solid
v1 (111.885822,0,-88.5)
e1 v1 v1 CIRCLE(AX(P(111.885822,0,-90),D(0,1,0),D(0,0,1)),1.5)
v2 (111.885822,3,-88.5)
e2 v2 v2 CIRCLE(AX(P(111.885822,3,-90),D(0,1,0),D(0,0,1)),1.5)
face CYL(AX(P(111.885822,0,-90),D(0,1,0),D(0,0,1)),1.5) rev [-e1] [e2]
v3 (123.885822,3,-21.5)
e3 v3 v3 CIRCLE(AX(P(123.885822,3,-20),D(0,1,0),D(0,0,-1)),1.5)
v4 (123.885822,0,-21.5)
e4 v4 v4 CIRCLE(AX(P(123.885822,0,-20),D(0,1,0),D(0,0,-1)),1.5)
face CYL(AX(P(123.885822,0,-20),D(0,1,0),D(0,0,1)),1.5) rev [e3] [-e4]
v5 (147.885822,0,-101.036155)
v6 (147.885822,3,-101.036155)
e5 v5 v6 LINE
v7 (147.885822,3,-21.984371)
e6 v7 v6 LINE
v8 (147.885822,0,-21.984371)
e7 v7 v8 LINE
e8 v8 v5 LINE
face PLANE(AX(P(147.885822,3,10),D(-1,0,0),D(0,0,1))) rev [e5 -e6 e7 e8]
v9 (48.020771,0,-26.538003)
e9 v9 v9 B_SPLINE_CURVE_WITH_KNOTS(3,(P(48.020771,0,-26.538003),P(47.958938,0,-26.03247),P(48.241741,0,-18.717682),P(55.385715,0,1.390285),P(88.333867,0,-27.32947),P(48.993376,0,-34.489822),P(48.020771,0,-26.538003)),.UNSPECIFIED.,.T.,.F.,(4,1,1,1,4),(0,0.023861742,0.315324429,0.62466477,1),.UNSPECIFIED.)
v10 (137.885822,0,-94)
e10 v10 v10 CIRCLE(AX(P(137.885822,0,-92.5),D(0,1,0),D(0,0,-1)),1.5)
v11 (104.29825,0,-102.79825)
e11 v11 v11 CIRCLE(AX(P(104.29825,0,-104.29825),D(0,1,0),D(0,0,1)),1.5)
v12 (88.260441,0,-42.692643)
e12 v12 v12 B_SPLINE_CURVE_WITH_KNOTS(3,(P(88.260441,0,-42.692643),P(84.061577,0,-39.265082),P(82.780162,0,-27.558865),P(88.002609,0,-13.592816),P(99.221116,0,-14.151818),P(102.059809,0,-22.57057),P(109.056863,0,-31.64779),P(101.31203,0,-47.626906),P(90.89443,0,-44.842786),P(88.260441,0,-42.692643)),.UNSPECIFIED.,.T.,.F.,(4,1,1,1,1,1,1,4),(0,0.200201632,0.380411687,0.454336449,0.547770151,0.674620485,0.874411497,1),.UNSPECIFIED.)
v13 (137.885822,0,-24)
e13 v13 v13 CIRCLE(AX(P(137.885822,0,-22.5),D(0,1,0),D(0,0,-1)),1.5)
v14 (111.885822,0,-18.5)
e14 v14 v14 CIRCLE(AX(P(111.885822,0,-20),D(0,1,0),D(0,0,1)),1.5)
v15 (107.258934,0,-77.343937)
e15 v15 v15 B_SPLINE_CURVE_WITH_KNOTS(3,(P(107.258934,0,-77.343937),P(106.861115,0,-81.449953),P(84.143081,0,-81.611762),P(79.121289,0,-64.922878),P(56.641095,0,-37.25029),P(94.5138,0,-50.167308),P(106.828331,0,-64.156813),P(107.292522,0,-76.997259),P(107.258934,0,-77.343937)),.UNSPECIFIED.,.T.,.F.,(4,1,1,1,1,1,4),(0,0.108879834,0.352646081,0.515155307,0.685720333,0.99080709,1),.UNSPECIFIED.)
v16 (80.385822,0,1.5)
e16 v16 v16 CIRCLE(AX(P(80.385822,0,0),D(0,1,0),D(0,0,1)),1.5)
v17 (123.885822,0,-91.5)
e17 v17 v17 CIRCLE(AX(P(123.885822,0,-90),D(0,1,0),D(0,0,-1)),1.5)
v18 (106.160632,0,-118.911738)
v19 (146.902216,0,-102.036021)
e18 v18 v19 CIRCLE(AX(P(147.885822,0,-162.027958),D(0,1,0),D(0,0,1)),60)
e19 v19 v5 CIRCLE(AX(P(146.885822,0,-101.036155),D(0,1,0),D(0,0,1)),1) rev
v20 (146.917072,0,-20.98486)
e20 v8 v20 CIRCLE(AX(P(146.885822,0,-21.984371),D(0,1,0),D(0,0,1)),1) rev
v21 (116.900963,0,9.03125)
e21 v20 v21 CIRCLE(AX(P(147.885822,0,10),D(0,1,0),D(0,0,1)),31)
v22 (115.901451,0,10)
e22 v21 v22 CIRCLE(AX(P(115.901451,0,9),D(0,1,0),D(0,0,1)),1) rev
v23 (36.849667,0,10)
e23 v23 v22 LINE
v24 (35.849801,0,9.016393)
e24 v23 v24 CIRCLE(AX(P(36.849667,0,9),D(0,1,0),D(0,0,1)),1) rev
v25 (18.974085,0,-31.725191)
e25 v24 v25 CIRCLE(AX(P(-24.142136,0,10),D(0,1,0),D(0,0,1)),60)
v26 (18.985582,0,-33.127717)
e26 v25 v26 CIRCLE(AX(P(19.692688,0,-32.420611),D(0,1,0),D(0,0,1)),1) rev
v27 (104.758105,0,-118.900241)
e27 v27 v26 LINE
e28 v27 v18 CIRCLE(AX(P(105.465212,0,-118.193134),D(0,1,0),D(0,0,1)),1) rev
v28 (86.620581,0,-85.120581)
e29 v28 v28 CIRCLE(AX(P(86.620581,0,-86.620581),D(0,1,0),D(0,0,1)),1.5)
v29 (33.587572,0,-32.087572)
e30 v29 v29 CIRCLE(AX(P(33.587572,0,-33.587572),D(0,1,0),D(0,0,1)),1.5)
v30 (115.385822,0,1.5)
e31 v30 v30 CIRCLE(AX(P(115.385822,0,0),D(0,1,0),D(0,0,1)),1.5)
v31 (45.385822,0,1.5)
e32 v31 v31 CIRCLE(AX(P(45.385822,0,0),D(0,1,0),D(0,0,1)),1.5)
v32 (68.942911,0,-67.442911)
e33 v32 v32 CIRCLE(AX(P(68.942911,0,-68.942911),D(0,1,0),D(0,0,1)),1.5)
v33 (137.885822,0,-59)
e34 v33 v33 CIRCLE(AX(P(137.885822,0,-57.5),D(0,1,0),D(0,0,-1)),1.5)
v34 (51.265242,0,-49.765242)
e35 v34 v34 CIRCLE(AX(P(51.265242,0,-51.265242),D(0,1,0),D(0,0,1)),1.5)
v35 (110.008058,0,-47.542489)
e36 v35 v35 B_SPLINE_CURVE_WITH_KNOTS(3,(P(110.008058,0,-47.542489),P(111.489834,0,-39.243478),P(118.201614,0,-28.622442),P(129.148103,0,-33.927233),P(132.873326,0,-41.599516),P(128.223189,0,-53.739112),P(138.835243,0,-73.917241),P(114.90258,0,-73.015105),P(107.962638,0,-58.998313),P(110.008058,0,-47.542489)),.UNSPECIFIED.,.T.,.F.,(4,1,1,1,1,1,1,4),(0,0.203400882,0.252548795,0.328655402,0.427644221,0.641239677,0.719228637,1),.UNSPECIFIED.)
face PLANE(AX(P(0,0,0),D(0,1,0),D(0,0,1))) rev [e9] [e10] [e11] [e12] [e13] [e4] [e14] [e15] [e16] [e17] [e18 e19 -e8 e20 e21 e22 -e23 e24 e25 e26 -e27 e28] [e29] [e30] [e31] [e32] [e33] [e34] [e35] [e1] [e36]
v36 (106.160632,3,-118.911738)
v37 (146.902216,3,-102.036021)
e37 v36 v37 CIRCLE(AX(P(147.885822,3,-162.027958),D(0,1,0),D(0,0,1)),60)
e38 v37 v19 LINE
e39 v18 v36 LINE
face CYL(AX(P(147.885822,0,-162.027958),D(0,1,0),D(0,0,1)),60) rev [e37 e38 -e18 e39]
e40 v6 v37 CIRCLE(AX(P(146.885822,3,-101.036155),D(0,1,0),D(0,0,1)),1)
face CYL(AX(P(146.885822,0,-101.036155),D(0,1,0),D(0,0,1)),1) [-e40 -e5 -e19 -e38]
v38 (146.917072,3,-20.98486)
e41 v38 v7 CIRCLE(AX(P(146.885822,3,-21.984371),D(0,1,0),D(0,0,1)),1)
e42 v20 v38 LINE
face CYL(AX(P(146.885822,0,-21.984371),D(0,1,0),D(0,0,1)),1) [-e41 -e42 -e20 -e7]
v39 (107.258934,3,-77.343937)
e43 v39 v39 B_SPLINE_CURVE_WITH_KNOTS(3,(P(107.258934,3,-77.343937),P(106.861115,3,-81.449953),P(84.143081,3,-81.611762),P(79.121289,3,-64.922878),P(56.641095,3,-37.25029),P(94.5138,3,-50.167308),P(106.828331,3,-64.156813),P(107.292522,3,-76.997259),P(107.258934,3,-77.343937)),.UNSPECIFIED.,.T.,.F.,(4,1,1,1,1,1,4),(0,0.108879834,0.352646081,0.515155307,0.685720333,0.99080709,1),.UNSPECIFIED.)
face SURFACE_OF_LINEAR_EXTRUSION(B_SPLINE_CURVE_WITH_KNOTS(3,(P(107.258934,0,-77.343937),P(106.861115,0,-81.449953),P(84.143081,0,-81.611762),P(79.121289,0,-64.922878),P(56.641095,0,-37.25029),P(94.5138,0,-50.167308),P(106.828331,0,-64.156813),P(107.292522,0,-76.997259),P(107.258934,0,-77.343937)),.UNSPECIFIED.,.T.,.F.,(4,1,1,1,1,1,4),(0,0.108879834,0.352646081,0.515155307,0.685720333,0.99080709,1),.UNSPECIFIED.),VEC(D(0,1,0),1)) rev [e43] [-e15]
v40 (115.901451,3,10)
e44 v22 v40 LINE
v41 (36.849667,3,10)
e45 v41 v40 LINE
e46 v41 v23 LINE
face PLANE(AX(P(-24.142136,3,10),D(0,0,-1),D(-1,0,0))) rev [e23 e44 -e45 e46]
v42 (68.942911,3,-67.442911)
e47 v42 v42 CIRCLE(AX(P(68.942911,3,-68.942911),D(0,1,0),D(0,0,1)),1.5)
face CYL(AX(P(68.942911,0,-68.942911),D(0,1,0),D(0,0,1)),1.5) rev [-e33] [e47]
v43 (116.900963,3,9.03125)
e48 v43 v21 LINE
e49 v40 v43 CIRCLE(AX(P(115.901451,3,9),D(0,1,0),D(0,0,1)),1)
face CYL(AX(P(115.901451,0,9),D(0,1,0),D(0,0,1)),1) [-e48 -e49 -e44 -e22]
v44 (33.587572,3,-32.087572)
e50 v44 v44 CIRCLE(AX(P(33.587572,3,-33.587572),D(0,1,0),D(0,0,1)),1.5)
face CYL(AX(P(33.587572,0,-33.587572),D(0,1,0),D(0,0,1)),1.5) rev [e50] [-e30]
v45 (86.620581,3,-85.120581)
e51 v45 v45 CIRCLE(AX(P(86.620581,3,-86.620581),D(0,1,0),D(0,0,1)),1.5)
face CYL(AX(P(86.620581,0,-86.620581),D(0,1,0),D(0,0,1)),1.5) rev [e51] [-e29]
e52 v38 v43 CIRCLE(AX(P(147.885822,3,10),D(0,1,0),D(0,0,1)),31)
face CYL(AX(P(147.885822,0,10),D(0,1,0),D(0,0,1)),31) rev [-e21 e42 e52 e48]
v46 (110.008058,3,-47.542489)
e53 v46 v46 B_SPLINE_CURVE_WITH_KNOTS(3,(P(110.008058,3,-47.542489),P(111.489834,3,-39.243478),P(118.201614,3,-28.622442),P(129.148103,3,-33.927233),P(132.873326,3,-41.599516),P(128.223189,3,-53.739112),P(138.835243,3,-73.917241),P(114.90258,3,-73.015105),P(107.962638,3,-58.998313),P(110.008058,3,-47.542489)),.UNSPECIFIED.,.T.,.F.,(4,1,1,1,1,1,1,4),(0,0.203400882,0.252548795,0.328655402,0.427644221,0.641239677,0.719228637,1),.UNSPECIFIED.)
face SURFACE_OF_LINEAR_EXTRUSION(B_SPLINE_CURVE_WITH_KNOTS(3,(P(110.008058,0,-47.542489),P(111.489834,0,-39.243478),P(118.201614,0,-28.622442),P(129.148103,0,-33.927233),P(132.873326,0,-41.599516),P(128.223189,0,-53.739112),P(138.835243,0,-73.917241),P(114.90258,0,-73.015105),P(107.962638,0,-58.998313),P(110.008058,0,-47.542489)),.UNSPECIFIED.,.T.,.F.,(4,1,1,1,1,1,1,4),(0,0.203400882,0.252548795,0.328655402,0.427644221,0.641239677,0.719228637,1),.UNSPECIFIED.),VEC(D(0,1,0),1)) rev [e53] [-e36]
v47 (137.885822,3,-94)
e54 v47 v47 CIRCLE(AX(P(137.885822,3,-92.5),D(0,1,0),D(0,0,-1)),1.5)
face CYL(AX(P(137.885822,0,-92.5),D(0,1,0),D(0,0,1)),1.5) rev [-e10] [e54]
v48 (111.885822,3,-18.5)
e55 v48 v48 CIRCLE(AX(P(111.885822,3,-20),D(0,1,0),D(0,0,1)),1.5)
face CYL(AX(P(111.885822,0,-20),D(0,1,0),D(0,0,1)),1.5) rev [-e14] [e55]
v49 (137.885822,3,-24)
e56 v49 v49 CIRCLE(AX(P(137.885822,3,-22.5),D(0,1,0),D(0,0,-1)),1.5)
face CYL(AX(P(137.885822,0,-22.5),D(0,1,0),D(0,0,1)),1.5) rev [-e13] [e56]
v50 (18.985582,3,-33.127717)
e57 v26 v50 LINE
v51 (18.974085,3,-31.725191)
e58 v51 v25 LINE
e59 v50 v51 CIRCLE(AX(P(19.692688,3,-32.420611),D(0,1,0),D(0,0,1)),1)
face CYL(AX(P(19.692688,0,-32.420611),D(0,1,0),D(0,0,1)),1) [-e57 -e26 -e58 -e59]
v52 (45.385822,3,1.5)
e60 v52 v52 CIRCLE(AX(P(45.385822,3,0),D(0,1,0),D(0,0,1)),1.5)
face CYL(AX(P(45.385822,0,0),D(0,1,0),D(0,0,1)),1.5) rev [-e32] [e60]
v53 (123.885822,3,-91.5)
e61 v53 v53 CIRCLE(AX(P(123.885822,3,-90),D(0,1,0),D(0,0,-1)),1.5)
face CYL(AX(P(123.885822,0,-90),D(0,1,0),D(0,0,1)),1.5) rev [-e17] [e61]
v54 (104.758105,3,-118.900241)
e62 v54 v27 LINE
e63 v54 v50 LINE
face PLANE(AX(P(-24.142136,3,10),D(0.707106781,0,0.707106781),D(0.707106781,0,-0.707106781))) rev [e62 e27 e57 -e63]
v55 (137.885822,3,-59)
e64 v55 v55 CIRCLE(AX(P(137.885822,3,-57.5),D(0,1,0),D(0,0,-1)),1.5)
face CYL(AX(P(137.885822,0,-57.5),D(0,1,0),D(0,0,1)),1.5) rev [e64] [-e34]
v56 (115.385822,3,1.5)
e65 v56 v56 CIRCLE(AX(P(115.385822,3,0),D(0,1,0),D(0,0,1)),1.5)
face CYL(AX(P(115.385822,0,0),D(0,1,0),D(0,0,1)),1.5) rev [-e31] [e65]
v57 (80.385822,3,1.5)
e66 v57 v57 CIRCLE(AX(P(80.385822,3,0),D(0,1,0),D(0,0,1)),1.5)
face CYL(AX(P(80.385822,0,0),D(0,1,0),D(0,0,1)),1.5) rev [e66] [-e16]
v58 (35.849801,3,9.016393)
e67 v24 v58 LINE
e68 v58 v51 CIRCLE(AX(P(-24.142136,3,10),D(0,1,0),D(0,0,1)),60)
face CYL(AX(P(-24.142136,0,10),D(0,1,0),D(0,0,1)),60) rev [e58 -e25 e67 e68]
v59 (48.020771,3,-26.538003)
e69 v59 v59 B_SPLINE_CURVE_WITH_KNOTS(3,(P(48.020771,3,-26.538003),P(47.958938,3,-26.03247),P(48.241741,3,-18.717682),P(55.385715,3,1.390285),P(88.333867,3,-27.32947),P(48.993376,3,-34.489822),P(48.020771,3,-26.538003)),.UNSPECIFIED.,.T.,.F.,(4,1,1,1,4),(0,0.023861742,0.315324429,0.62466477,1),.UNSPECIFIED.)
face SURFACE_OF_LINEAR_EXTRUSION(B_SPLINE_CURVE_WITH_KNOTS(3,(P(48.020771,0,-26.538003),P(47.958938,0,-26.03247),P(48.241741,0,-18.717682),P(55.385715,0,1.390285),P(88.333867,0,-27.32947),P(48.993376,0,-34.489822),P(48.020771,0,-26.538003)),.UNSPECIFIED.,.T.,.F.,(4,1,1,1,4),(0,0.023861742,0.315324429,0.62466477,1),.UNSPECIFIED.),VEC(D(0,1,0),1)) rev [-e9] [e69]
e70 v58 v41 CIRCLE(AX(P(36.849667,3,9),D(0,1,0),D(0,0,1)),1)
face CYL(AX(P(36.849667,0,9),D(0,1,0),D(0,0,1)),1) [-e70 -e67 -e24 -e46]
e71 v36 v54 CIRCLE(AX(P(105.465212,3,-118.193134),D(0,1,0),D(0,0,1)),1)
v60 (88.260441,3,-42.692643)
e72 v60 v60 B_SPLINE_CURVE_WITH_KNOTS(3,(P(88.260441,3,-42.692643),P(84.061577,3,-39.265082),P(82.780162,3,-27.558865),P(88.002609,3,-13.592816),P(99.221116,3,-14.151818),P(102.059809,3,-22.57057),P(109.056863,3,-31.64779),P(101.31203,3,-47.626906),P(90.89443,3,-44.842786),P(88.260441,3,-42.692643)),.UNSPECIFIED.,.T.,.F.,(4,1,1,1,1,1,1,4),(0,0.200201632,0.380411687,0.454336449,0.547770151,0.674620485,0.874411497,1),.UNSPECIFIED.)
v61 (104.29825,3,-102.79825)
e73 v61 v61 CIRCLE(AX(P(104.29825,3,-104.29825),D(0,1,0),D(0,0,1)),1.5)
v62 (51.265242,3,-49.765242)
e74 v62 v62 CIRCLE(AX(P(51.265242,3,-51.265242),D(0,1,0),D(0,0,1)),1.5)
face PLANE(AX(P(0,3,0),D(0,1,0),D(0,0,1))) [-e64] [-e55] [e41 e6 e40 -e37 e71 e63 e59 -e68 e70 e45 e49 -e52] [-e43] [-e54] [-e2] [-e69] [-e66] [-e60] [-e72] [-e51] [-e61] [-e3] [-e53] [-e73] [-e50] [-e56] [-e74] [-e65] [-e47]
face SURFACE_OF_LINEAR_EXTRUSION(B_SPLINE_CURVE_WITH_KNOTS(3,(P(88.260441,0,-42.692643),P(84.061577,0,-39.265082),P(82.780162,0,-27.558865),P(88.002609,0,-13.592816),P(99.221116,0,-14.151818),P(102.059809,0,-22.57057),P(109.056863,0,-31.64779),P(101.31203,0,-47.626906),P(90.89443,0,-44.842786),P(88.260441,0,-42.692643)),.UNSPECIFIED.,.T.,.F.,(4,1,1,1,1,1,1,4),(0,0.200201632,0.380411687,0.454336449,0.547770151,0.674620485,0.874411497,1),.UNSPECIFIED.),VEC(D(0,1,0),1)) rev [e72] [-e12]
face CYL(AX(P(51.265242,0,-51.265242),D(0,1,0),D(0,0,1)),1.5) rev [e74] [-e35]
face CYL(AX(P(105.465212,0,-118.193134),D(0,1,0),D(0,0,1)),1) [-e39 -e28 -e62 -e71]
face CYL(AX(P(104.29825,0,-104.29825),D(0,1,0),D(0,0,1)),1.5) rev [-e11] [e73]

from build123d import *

# Parameters (mm, degrees)
EXTRUDE_1_DEPTH     = 3
SKETCH_2_R          = 60
SKETCH_2_R_2        = 31
CUT_EXTRUDE_1_DEPTH = 220.390691703
SKETCH_3_R          = 1.5
CUT_EXTRUDE_2_DEPTH = 191.220260404
CUT_EXTRUDE_START   = -3
CUT_EXTRUDE_3_DEPTH = 3
FILLET_1_R          = 1


# Read off the part's stored shape, not the designer's step: 切除-拉伸3
with BuildPart() as part:
    # 草图1 → 凸台-拉伸1 (new body)
    with BuildSketch(Plane(origin=(0, 0, 0), x_dir=(1, 0, 0), z_dir=(0, 1, 0))):
        Polygon((147.885822331, -10), (147.885822331, 162.027957955), (-24.142135624, -10), align=None)
    extrude(amount=EXTRUDE_1_DEPTH)

    # 草图2 → 切除-拉伸1 (cut, through all)
    with BuildSketch(Plane(origin=(0, 3, 0), x_dir=(1, 0, 0), z_dir=(0, 1, 0))):
        with Locations((147.885822331, 162.027957955)):
            Circle(SKETCH_2_R)
        with Locations((-24.142135624, -10)):
            Circle(SKETCH_2_R)
        with Locations((147.885822331, -10)):
            Circle(SKETCH_2_R_2)
    extrude(amount=-CUT_EXTRUDE_1_DEPTH, mode=Mode.SUBTRACT)

    # 草图3 → 切除-拉伸2 (cut, through all)
    with BuildSketch(Plane(origin=(0, 3, 0), x_dir=(1, 0, 0), z_dir=(0, 1, 0))):
        with Locations(Location((115.385822331, 0, 0), (0, 0, 270))):
            Circle(SKETCH_3_R)
        with Locations(Location((80.385822331, 0, 0), (0, 0, 270))):
            Circle(SKETCH_3_R)
        with Locations(Location((45.385822331, 0, 0), (0, 0, 270))):
            Circle(SKETCH_3_R)
        with Locations(Location((33.587572106, 33.587572106, 0), (0, 0, 270))):
            Circle(SKETCH_3_R)
        with Locations(Location((51.265241636, 51.265241636, 0), (0, 0, 270))):
            Circle(SKETCH_3_R)
        with Locations(Location((68.942911166, 68.942911166, 0), (0, 0, 270))):
            Circle(SKETCH_3_R)
        with Locations(Location((86.620580695, 86.620580695, 0), (0, 0, 270))):
            Circle(SKETCH_3_R)
        with Locations(Location((104.298250225, 104.298250225, 0), (0, 0, 270))):
            Circle(SKETCH_3_R)
        with Locations(Location((137.885822331, 22.5, 0), (0, 0, 90))):
            Circle(SKETCH_3_R)
        with Locations(Location((137.885822331, 57.5, 0), (0, 0, 90))):
            Circle(SKETCH_3_R)
        with Locations(Location((137.885822331, 92.5, 0), (0, 0, 90))):
            Circle(SKETCH_3_R)
        with Locations(Location((111.885822331, 90, 0), (0, 0, 270))):
            Circle(SKETCH_3_R)
        with Locations(Location((111.885822331, 20, 0), (0, 0, 270))):
            Circle(SKETCH_3_R)
        with Locations(Location((123.885822331, 90, 0), (0, 0, 90))):
            Circle(SKETCH_3_R)
        with Locations(Location((123.885822331, 20, 0), (0, 0, 90))):
            Circle(SKETCH_3_R)
    extrude(amount=-CUT_EXTRUDE_2_DEPTH, mode=Mode.SUBTRACT)

    # 切除-拉伸3 outline → 切除-拉伸3 (cut)
    with BuildSketch(Plane(origin=(0, 3, 0), x_dir=(1, 0, 0), z_dir=(0, 1, 0)).offset(CUT_EXTRUDE_START)):
        with BuildLine():
            add(Edge.make_bspline(
                [(107.258933635, 77.343936504), (106.861115496, 81.449952702), (84.143080775, 81.611762246), (79.12128884, 64.922878035), (56.641094904, 37.250289862), (94.51379987, 50.167307725), (106.828330693, 64.156813109), (107.292522099, 76.997258554), (107.258933635, 77.343936504)],
                knots=[0, 0, 0, 0, 0.108879834, 0.352646081, 0.515155307, 0.685720333, 0.99080709, 1, 1, 1, 1], degree=3))
        make_face()
        with BuildLine():
            add(Edge.make_bspline(
                [(88.260440691, 42.692642695), (84.061577104, 39.265082408), (82.780161964, 27.558864749), (88.002608571, 13.59281611), (99.221115721, 14.151818352), (102.059809279, 22.570570112), (109.056863232, 31.647789519), (101.312029857, 47.626905876), (90.894430167, 44.842785832), (88.260440691, 42.692642695)],
                knots=[0, 0, 0, 0, 0.200201632, 0.380411687, 0.454336449, 0.547770151, 0.674620485, 0.874411497, 1, 1, 1, 1], degree=3))
        make_face()
        with BuildLine():
            add(Edge.make_bspline(
                [(110.00805792, 47.542489479), (111.489833592, 39.243478408), (118.201614065, 28.622441595), (129.148102504, 33.927232535), (132.873326017, 41.599516216), (128.223189281, 53.739111701), (138.835243287, 73.917241433), (114.902579526, 73.015104638), (107.9626382, 58.998313199), (110.00805792, 47.542489479)],
                knots=[0, 0, 0, 0, 0.203400882, 0.252548795, 0.328655402, 0.427644221, 0.641239677, 0.719228637, 1, 1, 1, 1], degree=3))
        make_face()
        with BuildLine():
            add(Edge.make_bspline(
                [(48.020770875, 26.538003152), (47.958938015, 26.032470396), (48.241740663, 18.717682081), (55.385714942, -1.390285274), (88.333867129, 27.329469803), (48.993375924, 34.489822141), (48.020770875, 26.538003152)],
                knots=[0, 0, 0, 0, 0.023861742, 0.315324429, 0.62466477, 1, 1, 1, 1], degree=3))
        make_face()
    extrude(amount=CUT_EXTRUDE_3_DEPTH, mode=Mode.SUBTRACT)

    # 圆角1
    fillet_1_edges = [part.edges().sort_by_distance(p)[0] for p in [
        (147.885822331, 1.5, -102.027957955),
        (105.45941546, 1.5, -119.601551084),
        (35.857864376, 1.5, 10),
        (18.284271247, 1.5, -32.426406871),
        (116.885822331, 1.5, 10),
        (147.885822331, 1.5, -21),
    ]]
    fillet(fillet_1_edges, radius=FILLET_1_R)


solid = part.part
